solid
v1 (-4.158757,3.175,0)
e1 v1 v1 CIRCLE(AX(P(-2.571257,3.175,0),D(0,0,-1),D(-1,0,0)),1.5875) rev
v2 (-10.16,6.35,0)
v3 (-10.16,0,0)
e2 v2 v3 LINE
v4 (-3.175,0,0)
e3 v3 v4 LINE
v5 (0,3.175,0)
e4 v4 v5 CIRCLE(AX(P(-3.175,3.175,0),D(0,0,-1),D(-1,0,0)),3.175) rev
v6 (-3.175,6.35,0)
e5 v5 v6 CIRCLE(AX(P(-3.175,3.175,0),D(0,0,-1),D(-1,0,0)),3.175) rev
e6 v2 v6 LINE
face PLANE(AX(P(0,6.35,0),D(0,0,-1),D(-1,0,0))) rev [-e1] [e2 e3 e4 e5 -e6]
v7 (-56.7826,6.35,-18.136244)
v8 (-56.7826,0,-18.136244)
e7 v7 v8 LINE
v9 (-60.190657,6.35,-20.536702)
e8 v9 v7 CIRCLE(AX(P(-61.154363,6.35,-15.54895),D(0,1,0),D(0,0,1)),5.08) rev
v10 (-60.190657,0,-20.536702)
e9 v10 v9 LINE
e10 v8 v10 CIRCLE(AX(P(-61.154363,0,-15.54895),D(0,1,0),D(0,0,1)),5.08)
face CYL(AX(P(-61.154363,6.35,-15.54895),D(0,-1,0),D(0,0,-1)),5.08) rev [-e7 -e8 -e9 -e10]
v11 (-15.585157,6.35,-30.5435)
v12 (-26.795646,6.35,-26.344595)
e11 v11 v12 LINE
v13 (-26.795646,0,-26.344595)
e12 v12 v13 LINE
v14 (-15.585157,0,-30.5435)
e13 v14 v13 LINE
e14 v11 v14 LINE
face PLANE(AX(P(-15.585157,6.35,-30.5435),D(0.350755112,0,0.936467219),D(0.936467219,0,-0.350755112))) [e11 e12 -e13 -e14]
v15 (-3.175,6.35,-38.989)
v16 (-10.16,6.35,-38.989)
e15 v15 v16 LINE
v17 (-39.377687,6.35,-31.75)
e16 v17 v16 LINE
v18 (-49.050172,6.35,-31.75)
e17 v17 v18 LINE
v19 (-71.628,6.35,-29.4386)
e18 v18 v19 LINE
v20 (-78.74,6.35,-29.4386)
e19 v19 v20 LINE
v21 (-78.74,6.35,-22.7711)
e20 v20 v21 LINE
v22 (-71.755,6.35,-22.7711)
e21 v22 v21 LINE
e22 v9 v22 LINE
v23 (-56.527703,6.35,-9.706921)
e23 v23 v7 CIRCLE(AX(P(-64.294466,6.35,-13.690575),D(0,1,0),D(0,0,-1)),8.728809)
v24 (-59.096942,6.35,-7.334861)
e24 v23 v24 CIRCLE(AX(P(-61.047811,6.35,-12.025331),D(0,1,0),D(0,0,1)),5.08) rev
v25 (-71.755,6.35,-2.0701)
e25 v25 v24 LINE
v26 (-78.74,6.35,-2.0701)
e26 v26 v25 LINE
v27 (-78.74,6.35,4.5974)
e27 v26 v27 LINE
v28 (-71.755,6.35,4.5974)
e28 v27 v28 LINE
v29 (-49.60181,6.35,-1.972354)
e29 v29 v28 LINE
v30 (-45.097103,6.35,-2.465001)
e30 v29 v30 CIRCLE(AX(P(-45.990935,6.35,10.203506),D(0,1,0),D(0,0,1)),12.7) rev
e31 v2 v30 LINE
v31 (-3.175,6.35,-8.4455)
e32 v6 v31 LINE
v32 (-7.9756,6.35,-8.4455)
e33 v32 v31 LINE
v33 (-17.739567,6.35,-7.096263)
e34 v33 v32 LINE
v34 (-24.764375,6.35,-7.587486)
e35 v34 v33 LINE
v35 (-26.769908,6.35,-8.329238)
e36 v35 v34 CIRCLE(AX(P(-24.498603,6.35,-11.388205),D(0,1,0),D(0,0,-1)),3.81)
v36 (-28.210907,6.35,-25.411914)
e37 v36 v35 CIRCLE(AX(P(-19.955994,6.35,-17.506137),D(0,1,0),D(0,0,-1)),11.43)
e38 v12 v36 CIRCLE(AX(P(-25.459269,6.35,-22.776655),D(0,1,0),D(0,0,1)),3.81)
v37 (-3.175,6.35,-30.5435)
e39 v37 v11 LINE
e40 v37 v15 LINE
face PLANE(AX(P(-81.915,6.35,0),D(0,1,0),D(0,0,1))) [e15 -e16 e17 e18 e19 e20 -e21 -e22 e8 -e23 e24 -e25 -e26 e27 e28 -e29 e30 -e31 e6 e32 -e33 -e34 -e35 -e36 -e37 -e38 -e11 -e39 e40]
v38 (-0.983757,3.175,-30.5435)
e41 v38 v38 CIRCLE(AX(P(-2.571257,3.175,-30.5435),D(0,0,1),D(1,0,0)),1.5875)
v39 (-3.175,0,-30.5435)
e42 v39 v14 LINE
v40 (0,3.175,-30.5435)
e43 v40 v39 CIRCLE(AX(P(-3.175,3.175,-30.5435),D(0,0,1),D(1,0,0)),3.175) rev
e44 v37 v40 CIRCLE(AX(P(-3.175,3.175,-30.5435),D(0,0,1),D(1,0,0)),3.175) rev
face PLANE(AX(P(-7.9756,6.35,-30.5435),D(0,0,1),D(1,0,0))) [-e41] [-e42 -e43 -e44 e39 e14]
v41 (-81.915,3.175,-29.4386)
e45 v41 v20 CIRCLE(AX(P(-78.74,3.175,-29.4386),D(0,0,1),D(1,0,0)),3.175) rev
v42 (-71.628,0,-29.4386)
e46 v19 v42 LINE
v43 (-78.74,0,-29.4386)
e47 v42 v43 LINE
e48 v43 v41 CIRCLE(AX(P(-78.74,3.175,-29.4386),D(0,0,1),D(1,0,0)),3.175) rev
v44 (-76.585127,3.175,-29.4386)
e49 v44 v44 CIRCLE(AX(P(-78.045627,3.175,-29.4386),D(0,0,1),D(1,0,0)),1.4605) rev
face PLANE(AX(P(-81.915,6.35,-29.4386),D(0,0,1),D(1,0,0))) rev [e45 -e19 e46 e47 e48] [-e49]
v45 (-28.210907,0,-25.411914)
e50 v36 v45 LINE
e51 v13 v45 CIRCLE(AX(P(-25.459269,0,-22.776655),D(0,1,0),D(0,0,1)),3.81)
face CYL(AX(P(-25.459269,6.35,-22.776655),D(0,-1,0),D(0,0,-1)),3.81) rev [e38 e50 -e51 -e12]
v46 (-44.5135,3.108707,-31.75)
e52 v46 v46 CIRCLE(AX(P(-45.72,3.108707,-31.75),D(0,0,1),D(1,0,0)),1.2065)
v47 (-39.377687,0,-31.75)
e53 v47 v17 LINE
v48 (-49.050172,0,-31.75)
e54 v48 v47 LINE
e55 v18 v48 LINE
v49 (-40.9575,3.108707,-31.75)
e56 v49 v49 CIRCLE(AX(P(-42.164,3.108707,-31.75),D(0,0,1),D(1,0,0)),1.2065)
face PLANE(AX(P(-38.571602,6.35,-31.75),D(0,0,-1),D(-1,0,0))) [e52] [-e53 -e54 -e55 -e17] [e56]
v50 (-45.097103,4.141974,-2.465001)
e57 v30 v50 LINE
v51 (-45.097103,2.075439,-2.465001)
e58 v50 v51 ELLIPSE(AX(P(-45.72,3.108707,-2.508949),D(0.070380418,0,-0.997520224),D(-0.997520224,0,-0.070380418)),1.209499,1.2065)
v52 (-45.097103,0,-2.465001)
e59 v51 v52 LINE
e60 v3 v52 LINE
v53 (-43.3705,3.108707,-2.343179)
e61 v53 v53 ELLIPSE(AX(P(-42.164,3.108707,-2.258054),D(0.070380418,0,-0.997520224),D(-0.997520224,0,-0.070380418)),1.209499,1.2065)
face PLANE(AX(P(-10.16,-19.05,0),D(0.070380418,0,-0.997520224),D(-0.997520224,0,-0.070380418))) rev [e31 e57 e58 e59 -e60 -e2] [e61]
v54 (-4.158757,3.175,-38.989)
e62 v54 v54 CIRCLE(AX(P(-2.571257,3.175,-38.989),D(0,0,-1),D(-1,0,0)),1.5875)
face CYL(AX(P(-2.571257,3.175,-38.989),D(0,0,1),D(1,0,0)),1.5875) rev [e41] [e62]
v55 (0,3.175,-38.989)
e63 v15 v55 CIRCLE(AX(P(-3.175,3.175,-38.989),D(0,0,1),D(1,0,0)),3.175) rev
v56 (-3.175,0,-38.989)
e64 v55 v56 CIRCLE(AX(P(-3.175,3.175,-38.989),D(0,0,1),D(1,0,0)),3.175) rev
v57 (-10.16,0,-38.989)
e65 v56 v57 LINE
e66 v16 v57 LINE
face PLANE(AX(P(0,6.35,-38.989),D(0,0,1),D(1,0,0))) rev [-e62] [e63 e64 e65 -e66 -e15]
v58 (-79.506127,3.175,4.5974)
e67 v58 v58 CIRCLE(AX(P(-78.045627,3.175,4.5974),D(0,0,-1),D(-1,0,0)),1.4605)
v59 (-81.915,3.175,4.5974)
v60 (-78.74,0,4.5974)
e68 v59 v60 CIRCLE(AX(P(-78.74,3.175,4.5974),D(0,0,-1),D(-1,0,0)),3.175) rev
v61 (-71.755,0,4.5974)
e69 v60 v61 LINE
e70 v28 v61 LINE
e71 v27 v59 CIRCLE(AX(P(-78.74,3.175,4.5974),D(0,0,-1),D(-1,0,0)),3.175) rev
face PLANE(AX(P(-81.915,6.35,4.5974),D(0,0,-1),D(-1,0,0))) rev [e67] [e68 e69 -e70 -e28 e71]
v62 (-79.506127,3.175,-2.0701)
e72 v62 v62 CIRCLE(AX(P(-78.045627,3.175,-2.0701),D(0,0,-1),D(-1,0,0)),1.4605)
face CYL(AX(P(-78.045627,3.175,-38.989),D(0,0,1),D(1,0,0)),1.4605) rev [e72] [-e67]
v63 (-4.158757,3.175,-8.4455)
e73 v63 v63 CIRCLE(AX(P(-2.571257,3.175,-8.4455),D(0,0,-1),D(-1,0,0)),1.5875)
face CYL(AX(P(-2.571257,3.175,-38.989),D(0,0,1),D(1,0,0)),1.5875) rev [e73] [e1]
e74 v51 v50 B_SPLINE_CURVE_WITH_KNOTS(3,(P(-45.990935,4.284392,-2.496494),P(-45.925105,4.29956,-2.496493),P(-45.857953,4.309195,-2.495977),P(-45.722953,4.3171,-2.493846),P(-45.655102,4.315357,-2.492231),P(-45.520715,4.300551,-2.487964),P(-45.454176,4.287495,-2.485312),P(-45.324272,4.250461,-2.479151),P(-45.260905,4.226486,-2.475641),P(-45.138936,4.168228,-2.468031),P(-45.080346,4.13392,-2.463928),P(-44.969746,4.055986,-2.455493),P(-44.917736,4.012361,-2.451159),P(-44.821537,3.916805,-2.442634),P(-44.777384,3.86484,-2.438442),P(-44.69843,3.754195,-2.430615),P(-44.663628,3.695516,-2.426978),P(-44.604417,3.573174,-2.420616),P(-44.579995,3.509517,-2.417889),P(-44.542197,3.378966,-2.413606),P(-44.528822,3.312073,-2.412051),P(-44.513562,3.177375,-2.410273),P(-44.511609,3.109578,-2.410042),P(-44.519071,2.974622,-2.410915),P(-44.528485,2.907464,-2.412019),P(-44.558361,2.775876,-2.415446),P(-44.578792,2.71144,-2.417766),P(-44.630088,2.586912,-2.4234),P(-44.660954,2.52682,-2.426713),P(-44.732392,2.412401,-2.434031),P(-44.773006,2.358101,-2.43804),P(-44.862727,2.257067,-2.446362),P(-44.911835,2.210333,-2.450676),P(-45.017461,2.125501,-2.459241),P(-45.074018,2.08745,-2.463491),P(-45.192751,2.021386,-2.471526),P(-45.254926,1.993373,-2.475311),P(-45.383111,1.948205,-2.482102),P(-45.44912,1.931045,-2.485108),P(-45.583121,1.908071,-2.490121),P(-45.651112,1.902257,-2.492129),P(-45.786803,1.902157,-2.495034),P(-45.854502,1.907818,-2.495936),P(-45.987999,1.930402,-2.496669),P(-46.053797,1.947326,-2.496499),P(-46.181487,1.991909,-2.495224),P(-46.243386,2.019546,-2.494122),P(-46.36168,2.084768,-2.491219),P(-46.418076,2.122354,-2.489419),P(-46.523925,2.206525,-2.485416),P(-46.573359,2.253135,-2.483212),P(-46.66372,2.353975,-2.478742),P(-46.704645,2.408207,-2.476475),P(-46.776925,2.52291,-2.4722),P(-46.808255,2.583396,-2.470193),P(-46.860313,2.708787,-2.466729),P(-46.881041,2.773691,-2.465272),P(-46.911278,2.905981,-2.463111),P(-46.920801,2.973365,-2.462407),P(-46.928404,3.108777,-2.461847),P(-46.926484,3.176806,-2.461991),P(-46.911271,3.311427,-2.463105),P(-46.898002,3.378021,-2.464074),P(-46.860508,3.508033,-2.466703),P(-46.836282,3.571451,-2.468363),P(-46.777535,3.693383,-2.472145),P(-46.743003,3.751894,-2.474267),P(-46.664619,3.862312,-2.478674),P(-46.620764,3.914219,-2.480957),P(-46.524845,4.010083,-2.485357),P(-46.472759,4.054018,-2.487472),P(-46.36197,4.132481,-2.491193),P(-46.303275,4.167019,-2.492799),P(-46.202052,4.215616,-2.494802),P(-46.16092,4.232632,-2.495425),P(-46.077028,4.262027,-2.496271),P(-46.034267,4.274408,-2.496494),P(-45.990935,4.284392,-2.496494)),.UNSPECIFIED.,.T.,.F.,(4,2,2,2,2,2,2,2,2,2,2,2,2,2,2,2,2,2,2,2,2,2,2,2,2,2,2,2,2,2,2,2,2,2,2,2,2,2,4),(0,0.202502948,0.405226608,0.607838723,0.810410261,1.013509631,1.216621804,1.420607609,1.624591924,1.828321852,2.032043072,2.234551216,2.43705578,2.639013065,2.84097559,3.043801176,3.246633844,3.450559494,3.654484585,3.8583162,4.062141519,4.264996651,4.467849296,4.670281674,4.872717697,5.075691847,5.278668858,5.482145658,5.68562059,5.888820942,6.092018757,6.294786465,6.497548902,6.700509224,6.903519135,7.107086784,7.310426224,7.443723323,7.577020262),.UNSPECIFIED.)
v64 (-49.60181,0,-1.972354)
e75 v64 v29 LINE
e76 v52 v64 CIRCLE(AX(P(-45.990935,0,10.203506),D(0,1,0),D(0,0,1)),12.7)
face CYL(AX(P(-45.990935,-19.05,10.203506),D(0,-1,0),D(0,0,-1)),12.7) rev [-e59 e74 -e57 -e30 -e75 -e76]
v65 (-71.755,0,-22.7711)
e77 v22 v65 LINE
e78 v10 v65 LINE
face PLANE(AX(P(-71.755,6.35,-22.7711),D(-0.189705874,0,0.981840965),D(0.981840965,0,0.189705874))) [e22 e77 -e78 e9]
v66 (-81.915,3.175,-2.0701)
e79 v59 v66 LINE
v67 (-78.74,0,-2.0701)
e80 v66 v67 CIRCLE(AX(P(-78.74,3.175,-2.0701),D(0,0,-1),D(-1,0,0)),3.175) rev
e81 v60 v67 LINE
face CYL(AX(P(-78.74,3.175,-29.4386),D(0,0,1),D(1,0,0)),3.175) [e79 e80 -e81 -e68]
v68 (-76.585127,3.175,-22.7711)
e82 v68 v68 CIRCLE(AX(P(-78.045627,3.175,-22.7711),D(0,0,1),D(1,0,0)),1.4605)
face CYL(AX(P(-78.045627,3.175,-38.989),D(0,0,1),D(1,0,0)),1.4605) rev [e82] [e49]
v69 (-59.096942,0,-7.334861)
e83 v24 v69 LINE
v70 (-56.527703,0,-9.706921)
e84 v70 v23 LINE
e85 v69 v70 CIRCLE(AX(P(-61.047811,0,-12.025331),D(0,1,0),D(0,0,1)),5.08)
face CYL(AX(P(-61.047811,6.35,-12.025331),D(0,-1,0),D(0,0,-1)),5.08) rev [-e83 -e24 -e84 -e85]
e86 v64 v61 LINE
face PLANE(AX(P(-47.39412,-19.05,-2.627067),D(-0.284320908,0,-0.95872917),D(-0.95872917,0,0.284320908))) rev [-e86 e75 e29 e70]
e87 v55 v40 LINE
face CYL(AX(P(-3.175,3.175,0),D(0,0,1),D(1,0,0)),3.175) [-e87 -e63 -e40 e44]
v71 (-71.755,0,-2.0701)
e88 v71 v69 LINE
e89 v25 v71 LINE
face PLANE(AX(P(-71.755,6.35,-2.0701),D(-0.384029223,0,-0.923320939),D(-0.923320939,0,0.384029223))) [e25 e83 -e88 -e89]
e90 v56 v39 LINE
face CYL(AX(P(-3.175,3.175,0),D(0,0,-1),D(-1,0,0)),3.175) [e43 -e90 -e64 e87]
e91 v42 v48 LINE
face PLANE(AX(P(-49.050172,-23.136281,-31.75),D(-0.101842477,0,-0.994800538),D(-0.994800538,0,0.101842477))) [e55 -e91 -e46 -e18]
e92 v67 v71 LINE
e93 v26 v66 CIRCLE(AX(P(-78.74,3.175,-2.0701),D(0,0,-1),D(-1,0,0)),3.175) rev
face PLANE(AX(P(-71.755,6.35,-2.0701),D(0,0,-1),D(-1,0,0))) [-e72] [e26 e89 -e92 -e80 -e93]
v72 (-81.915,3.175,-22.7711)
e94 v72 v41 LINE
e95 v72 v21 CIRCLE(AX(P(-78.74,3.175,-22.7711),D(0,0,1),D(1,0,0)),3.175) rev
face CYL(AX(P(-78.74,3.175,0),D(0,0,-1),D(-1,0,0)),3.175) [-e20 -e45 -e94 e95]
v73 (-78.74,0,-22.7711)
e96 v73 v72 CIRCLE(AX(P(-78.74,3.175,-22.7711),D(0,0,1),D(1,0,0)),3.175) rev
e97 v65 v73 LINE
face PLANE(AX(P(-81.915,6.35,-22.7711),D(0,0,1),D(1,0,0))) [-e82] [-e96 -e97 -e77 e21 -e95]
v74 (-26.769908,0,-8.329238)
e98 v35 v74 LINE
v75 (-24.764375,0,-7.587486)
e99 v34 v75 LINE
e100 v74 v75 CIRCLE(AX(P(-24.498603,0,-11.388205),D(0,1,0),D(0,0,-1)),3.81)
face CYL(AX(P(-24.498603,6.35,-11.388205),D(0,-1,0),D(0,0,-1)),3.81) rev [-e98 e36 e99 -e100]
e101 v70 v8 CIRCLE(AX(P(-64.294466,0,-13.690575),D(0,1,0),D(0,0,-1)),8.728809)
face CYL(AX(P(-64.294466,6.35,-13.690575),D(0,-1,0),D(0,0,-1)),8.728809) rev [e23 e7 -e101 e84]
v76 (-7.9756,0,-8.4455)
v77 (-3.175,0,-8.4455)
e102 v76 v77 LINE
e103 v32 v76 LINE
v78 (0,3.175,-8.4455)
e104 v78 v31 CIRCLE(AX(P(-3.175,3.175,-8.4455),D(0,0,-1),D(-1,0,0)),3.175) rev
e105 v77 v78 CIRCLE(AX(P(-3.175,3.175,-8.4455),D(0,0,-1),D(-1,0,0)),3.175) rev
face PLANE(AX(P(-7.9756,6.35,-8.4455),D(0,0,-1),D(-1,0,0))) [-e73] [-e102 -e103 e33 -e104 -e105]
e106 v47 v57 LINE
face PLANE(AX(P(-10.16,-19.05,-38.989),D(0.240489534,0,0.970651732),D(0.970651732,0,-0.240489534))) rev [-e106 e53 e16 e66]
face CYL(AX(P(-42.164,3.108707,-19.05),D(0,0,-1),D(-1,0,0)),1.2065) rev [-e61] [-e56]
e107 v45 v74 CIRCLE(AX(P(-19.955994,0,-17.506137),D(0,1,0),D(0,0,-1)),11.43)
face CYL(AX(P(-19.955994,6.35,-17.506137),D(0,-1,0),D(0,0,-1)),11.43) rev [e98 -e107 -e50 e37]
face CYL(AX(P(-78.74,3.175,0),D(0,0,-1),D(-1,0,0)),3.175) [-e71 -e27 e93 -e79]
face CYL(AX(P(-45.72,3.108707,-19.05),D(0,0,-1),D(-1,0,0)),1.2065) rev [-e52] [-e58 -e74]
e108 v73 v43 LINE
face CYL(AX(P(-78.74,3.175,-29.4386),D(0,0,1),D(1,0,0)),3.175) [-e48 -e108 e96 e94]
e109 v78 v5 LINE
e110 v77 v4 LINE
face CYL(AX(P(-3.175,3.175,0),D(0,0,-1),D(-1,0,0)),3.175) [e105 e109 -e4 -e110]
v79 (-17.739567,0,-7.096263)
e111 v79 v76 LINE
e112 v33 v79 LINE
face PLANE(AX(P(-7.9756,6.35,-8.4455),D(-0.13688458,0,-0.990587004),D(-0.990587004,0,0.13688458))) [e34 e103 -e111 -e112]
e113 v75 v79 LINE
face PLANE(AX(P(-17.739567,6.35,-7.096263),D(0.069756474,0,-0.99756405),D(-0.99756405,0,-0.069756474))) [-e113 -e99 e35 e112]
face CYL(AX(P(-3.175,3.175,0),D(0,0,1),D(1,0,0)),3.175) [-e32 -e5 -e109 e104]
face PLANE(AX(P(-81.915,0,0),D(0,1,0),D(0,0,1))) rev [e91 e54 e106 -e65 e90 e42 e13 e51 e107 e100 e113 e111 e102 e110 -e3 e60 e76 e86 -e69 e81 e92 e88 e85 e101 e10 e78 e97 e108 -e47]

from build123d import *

# Parameters (mm, degrees)
BOSS_EXTRUDE1_DEPTH     = 6.35
FILLET2_R               = 3.175
CUT_EXTRUDE2_DEPTH      = 91.397918676
CUT_EXTRUDE2_DEPTH_BACK = 91.397918676
SKETCH2_R               = 1.5875
SKETCH2_R_2             = 1.4605
CUT_EXTRUDE5_DEPTH      = 91.942464482
CUT_EXTRUDE7_DEPTH      = 25.4
SKETCH6_W               = 10.4785697
SKETCH6_H               = 6.35
SKETCH6_R               = 1.2065
BOSS_EXTRUDE2_DEPTH     = 12.7
FILLET5_R               = 12.7
FILLET6_R               = 5.08
BOSS_EXTRUDE3_DEPTH     = 6.35
SKETCH10_R              = 1.2065
CUT_EXTRUDE9_DEPTH      = 90.841656328


with BuildPart() as part:
    # Sketch1 → Boss-Extrude1 (new body)
    with BuildSketch(Plane(origin=(0, 0, 0), x_dir=(1, 0, 0), z_dir=(0, 1, 0))):
        Polygon((0, 0), (0, 38.989), (-10.16, 38.989), (-71.628, 29.4386), (-81.915, 29.4386), (-81.915, -4.5974), (-71.755, -4.5974), (-10.16, 0), align=None)
    extrude(amount=BOSS_EXTRUDE1_DEPTH)

    # Fillet2
    fillet2_edges = [part.edges().sort_by_distance(p)[0] for p in [
        (0, 0, -19.4945),
        (0, 6.35, -19.4945),
        (-81.915, 0, -12.4206),
        (-81.915, 6.35, -12.4206),
    ]]
    fillet(fillet2_edges, radius=FILLET2_R - 0.0001)  # a hair under: the kernel refuses the full size

    # Sketch2 → Cut-Extrude2 (cut, two sides: drawn at the far end of the back side and taken through both)
    with BuildSketch(Plane(origin=(-0.604981675, 0, 0), x_dir=(-1, 0, 0), z_dir=(0, 0, -1)).offset(-CUT_EXTRUDE2_DEPTH_BACK)):
        with Locations((1.966275702, 3.175)):
            Circle(SKETCH2_R)
        with Locations(Location((77.44064574, 3.175, 0), (0, 0, 180))):
            Circle(SKETCH2_R_2)
    extrude(amount=CUT_EXTRUDE2_DEPTH + CUT_EXTRUDE2_DEPTH_BACK, mode=Mode.SUBTRACT)

    # Sketch3 → Cut-Extrude5 (cut, through all)
    with BuildSketch(Plane(origin=(0, 0, 0), x_dir=(1, 0, 0), z_dir=(0, 1, 0))):
        with BuildLine():
            Line((-81.915, 22.7711), (-71.755, 22.7711))
            Line((-71.755, 22.7711), (-58.487579402, 20.207642468))
            ThreePointArc((-58.487579402, 20.207642468), (-55.580114305, 14.192748547), (-57.777398298, 7.883687982))
            Line((-57.777398298, 7.883687982), (-71.755, 2.0701))
            Line((-71.755, 2.0701), (-81.915, 2.0701))
            Line((-81.915, 2.0701), (-81.915, 22.7711))
        make_face()
        with BuildLine():
            Line((0, 30.5435), (0, 8.4455))
            Line((0, 8.4455), (-7.9756, 8.4455))
            Line((-7.9756, 8.4455), (-17.739567161, 7.096263095))
            Line((-17.739567161, 7.096263095), (-24.764375431, 7.587485542))
            ThreePointArc((-24.764375431, 7.587485542), (-25.820245836, 7.814780317), (-26.769908004, 8.32923828))
            ThreePointArc((-26.769908004, 8.32923828), (-31.345543526, 16.545378703), (-28.210906636, 25.41191441))
            ThreePointArc((-28.210906636, 25.41191441), (-27.55579932, 25.957953915), (-26.795645997, 26.34459543))
            Line((-26.795645997, 26.34459543), (-15.585156538, 30.5435))
            Line((-15.585156538, 30.5435), (-7.9756, 30.5435))
            Line((-7.9756, 30.5435), (0, 30.5435))
        make_face()
    extrude(amount=CUT_EXTRUDE5_DEPTH, mode=Mode.SUBTRACT)

    # Sketch5 → Cut-Extrude7 (cut)
    with BuildSketch(Plane(origin=(0, 6.35, 0), x_dir=(1, 0, 0), z_dir=(0, 1, 0))):
        Polygon((-10.16, 38.989), (-53.78735915, 28.179846815), (-71.628, 29.4386), align=None)
        Polygon((-10.16, 0), (-47.394119509, 2.627067431), (-71.755, -4.5974), align=None)
    extrude(amount=-CUT_EXTRUDE7_DEPTH, mode=Mode.SUBTRACT)

    # Sketch6 → Boss-Extrude2 (add)
    with BuildSketch(Plane.XY.offset(-31.75)):
        with Locations((-43.810886798, 3.175)):
            Rectangle(SKETCH6_W, SKETCH6_H)
        with Locations((-45.72, 3.108706623)):
            Circle(SKETCH6_R, mode=Mode.SUBTRACT)
        with Locations((-42.164, 3.108706623)):
            Circle(SKETCH6_R, mode=Mode.SUBTRACT)
    extrude(amount=BOSS_EXTRUDE2_DEPTH)

    # Fillet5
    fillet5_edges = [part.edges().sort_by_distance(p)[0] for p in [
        (-53.78735915, 3.175, -28.179846815),
        (-47.394119509, 3.175, -2.627067431),
    ]]
    fillet(fillet5_edges, radius=FILLET5_R)

    # Fillet6
    fillet6_edges = [part.edges().sort_by_distance(p)[0] for p in [
        (-57.777398298, 3.175, -7.883687982),
        (-58.487579402, 3.175, -20.207642468),
    ]]
    fillet(fillet6_edges, radius=FILLET6_R)

    # Sketch9 → Boss-Extrude3 (add)
    with BuildSketch(Plane(origin=(0, 6.35, 0), x_dir=(1, 0, 0), z_dir=(0, 1, 0))):
        Polygon((-49.050171648, 31.75), (-71.628, 29.4386), (-71.628, 26.697361781), (-49.050171648, 26.697361781), align=None)
    extrude(amount=-BOSS_EXTRUDE3_DEPTH)

    # Sketch10 → Cut-Extrude9 (cut, through all)
    with BuildSketch(Plane(origin=(0, 0, -31.75), x_dir=(-1, 0, 0), z_dir=(0, 0, -1))):
        with Locations((42.164, 3.108706623)):
            Circle(SKETCH10_R)
        with Locations(Location((45.72, 3.108706623, 0), (0, 0, 121.083308631))):
            Circle(SKETCH10_R)
    extrude(amount=-CUT_EXTRUDE9_DEPTH, mode=Mode.SUBTRACT)


solid = part.part
